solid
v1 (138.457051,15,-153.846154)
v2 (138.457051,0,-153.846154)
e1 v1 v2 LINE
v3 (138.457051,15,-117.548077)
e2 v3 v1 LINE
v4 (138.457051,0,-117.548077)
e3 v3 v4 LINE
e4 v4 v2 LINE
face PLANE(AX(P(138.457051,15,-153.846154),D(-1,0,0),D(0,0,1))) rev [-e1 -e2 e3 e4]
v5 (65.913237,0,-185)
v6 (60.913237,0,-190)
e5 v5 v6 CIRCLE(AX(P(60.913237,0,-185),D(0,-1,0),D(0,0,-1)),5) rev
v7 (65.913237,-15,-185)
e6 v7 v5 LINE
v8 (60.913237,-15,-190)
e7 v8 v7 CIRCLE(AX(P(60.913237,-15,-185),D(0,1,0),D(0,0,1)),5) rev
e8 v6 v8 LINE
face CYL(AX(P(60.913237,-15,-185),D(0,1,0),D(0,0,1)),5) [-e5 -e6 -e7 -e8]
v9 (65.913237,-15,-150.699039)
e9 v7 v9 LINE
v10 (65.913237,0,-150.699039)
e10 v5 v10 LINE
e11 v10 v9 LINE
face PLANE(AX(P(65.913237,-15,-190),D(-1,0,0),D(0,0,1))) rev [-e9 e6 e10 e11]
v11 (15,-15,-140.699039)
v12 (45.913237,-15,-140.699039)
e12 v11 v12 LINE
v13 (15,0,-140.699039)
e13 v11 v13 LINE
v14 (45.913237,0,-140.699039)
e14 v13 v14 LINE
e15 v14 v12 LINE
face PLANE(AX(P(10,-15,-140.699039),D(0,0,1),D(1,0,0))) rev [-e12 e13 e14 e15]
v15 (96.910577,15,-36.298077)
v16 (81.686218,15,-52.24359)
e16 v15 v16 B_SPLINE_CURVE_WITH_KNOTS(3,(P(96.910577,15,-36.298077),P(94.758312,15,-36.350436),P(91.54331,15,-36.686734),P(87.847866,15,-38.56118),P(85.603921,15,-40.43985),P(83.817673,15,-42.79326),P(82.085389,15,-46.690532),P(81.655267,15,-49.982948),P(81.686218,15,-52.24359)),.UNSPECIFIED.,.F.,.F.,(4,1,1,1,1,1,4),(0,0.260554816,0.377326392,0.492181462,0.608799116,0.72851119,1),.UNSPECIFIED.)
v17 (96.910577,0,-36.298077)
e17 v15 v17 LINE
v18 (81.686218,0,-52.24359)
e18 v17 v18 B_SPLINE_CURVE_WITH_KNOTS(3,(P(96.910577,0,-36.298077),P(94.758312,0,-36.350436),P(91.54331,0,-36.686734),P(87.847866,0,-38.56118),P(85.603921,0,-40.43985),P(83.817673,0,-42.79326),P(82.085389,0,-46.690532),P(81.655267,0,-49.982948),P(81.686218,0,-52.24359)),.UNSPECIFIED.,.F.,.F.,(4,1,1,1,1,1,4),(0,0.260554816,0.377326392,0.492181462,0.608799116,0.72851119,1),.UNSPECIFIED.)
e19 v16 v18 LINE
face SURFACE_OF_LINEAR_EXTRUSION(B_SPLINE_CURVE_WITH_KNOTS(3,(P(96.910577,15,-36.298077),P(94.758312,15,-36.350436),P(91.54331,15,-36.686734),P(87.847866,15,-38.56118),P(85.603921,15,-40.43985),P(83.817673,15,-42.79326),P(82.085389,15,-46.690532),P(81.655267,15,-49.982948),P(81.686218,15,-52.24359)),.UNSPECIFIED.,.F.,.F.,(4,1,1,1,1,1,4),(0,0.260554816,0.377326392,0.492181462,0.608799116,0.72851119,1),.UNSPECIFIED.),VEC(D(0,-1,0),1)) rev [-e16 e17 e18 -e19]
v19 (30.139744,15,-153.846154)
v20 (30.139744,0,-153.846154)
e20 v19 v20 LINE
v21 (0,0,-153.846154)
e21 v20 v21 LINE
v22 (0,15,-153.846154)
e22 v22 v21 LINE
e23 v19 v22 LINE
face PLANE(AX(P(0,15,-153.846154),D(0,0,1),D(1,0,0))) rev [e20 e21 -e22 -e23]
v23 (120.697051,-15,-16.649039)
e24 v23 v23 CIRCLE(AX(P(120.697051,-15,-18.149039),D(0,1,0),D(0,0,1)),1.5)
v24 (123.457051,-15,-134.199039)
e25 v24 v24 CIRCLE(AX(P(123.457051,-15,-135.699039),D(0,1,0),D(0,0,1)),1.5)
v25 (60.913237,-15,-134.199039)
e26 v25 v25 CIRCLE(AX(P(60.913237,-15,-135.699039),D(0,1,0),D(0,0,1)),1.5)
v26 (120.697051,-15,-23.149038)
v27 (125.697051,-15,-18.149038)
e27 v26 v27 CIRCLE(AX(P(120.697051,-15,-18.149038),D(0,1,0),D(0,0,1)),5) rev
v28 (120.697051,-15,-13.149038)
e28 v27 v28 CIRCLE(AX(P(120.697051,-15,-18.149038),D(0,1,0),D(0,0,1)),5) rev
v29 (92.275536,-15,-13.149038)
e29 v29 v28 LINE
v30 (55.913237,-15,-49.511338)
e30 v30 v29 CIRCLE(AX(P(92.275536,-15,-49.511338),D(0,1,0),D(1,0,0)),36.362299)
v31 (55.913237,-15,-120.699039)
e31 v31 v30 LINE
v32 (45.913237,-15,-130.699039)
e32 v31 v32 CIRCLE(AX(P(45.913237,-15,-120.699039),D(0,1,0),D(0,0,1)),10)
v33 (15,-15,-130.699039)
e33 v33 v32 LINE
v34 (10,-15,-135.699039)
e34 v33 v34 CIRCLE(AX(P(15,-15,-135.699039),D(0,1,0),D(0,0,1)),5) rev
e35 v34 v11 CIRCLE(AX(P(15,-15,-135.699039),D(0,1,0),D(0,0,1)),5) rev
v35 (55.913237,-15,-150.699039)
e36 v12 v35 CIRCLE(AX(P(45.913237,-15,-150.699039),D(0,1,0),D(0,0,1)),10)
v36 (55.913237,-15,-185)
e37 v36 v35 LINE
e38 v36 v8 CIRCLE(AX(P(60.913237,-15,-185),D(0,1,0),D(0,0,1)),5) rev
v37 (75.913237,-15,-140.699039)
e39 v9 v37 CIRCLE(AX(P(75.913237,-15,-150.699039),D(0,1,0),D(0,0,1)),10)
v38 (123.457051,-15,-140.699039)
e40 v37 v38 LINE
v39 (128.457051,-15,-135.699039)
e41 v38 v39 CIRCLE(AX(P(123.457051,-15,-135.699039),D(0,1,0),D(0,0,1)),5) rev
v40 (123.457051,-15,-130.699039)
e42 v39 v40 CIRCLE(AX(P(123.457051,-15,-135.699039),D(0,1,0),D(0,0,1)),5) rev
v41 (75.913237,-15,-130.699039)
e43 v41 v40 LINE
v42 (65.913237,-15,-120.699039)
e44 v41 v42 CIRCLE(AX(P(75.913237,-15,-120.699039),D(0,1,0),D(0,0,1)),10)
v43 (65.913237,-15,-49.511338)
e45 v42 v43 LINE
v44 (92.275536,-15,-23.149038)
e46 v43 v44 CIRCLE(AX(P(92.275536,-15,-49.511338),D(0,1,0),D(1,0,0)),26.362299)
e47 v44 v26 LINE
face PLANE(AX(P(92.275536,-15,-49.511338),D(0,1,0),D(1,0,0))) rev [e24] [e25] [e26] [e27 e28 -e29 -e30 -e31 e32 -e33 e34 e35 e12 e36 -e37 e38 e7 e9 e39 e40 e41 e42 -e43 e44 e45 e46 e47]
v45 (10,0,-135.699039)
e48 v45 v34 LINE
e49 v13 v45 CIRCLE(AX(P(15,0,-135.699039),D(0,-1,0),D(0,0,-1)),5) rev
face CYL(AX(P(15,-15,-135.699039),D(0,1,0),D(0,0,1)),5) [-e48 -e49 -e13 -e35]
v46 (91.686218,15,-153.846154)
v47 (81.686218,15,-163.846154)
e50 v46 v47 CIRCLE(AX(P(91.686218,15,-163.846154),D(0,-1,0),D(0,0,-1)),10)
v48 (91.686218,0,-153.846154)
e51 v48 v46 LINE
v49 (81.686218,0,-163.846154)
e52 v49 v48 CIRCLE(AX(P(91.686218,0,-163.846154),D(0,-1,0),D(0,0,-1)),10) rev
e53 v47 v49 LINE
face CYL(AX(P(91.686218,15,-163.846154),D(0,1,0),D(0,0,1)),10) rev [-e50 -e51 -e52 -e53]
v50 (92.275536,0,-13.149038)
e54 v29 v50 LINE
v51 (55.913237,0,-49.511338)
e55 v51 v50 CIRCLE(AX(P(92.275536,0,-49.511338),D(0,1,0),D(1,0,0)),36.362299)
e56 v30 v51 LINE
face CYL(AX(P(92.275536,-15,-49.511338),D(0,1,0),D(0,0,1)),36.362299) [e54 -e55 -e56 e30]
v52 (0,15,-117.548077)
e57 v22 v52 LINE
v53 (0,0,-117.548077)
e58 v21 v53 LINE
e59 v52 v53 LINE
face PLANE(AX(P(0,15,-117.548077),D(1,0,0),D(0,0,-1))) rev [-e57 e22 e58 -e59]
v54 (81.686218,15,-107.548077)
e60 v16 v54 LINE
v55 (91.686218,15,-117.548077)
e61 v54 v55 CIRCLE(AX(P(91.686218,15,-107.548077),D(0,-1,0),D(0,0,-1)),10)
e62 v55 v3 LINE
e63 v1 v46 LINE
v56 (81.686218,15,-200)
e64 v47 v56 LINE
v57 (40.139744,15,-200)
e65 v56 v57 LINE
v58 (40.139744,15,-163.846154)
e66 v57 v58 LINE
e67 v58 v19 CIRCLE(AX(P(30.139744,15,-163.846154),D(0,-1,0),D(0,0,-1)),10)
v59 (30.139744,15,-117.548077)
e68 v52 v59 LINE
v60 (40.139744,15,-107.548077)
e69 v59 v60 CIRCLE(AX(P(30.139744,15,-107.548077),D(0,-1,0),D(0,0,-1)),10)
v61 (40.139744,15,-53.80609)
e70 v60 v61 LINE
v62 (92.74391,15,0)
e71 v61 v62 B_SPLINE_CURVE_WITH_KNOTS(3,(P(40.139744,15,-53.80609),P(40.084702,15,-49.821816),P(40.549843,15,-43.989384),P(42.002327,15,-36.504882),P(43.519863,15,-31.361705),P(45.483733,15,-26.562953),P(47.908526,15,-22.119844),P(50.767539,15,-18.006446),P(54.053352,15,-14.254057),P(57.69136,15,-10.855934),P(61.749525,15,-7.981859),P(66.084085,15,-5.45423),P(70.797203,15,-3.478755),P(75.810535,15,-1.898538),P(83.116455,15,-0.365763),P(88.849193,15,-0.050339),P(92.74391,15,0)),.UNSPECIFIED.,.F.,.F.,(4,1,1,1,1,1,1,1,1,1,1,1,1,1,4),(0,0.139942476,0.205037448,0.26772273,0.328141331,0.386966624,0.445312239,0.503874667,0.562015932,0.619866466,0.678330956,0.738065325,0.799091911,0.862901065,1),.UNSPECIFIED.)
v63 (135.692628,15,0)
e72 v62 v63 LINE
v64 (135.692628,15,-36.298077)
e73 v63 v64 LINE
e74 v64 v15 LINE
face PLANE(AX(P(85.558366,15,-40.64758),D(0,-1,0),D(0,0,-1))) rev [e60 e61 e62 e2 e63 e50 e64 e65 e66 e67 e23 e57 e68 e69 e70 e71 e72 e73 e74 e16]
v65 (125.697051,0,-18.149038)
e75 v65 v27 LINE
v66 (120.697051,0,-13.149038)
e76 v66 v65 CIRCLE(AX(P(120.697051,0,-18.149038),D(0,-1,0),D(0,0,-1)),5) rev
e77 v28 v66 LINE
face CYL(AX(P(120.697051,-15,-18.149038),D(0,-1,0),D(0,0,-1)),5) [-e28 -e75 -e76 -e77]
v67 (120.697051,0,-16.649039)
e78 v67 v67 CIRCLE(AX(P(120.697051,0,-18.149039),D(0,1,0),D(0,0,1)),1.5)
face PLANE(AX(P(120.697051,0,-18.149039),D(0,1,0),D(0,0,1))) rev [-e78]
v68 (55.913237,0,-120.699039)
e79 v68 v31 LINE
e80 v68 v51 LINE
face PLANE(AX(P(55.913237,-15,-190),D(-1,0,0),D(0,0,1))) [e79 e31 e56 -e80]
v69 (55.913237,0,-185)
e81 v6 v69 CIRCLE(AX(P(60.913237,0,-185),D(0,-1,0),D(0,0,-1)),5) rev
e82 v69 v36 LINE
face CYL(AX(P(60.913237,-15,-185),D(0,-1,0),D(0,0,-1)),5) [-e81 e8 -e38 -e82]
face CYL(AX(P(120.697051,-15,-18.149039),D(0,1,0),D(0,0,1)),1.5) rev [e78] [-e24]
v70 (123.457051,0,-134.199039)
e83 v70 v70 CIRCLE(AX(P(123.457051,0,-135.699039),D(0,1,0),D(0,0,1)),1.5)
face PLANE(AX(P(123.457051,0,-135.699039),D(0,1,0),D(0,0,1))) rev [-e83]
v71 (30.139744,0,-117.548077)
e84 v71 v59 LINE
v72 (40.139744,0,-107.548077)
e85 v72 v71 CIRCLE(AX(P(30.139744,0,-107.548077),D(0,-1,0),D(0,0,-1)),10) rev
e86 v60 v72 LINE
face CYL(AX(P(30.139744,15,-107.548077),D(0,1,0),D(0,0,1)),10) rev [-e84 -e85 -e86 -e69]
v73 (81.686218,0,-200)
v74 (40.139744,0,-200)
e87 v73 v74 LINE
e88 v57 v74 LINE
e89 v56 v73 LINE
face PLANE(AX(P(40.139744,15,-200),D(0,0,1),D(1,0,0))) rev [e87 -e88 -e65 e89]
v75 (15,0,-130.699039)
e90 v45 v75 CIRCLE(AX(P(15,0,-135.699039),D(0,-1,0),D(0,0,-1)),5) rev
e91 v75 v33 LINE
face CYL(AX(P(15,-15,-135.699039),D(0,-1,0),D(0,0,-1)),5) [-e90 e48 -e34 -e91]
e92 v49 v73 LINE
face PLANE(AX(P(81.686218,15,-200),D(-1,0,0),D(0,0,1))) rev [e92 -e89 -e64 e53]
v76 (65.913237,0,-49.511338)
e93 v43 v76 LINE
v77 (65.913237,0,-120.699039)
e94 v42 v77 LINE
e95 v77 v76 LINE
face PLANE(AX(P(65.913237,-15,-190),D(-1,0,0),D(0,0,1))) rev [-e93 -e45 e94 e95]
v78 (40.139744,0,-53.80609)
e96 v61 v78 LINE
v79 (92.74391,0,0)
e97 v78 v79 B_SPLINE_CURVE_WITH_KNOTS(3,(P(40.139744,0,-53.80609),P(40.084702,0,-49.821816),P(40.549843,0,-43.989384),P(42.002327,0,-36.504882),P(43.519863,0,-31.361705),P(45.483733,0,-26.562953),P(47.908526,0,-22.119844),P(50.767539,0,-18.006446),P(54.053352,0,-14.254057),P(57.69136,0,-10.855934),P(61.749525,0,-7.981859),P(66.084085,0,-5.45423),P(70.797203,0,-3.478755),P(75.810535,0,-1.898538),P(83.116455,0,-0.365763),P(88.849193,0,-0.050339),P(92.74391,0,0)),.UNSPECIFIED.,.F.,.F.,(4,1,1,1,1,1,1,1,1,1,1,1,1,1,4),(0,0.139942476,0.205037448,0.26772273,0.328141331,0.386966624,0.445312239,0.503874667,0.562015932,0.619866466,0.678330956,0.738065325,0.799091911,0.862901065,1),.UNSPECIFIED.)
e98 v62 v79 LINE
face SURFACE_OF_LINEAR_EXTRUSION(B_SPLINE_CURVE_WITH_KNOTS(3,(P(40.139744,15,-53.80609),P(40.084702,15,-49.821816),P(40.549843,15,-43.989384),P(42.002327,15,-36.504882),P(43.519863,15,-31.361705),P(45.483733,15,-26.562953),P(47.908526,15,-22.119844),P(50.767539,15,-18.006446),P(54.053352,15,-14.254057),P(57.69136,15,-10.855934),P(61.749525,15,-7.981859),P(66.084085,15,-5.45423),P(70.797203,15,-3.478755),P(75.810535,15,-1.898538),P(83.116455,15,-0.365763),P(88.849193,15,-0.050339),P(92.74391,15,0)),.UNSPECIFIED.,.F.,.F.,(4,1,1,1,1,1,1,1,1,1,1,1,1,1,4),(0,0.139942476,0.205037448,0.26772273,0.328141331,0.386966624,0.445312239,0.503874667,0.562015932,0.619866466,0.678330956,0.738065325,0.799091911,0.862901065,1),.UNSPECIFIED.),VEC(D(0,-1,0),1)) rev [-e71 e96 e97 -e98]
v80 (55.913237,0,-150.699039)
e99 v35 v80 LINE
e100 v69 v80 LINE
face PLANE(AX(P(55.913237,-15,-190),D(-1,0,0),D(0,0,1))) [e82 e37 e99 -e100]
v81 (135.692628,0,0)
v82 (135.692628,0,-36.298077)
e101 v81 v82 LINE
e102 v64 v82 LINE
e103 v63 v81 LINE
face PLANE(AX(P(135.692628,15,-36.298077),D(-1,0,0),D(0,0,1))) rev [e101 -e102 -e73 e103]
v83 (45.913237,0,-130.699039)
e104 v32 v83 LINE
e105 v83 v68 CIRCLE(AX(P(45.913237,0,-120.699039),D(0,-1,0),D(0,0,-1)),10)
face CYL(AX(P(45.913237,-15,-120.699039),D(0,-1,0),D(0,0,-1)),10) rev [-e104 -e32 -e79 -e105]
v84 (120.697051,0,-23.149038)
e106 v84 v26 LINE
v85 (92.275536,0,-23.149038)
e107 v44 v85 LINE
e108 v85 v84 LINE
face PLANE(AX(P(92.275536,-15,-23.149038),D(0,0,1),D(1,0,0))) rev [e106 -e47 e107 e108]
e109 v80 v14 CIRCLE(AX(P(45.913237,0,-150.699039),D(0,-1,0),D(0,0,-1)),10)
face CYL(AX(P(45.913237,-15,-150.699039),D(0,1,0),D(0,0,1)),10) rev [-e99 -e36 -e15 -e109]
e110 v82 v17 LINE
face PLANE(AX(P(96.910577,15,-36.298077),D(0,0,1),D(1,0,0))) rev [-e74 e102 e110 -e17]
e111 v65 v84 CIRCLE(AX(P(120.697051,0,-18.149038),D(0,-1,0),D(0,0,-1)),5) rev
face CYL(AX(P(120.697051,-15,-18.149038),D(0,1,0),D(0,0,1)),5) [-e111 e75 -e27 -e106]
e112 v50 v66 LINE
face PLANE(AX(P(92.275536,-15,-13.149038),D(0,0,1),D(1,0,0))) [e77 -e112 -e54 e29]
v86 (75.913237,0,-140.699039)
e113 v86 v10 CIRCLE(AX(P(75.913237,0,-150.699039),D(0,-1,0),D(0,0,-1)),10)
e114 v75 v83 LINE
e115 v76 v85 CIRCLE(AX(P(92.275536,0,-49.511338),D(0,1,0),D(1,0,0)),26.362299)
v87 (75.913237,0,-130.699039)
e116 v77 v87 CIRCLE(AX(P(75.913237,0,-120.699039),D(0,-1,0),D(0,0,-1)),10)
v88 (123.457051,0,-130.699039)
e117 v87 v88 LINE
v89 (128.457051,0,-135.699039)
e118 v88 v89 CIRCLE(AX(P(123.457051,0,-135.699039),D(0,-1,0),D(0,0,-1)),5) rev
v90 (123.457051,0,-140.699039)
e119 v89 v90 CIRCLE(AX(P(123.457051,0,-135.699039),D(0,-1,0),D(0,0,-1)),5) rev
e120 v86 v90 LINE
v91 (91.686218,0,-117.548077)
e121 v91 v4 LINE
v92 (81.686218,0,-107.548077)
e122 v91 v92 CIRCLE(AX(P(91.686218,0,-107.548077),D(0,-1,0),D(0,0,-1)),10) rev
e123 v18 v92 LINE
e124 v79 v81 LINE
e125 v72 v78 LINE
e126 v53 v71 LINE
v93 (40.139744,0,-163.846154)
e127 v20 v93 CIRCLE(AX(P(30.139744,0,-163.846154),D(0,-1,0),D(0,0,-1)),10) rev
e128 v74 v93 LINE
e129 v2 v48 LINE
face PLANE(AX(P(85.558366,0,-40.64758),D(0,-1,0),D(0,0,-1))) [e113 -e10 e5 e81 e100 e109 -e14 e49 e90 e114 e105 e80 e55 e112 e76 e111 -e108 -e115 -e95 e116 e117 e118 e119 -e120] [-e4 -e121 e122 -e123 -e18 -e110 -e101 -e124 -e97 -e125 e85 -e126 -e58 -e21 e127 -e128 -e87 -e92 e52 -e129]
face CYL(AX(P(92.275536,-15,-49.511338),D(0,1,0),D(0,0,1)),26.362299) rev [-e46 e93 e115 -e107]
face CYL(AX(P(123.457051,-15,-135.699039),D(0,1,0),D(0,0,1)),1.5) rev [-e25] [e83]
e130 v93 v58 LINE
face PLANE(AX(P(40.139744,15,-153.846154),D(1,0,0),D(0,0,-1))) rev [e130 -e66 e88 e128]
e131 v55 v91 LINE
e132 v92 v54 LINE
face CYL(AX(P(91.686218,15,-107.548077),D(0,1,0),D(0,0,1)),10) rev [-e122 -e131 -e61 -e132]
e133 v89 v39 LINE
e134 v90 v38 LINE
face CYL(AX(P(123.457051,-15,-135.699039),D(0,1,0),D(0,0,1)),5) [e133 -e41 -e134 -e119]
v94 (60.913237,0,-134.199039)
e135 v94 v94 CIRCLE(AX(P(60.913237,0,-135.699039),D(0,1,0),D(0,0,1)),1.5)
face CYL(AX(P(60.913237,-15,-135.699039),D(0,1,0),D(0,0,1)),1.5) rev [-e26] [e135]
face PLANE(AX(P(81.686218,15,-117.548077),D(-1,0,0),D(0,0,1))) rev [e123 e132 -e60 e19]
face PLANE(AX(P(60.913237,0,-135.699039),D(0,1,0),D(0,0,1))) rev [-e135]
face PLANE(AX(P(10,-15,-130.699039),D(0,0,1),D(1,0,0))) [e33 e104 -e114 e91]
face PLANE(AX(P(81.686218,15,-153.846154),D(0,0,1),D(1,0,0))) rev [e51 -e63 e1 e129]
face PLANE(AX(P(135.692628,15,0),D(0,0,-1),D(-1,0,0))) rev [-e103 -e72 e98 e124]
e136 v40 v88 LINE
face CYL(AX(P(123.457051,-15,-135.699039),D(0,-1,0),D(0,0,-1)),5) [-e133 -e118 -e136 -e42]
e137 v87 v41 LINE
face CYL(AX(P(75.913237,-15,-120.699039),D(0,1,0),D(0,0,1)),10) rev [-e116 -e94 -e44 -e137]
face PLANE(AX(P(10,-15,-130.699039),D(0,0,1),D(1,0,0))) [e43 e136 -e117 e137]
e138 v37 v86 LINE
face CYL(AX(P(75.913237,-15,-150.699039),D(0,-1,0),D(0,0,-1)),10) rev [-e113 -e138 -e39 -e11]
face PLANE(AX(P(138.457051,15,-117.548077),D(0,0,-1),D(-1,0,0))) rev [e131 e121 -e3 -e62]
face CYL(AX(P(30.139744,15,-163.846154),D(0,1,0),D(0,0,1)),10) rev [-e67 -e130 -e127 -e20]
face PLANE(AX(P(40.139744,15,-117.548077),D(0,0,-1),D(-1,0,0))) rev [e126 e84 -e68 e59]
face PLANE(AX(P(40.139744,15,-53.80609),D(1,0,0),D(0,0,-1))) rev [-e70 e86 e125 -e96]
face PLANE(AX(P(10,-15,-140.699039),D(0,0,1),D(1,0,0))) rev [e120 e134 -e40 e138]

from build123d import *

# Parameters (mm, degrees)
EXTRUDE_T_DEPTH        = 15
SKETCH_937_W           = 118.457051
SKETCH_937_H           = 10
EXTRUDE_1_DEPTH        = 15
FILLET_1172_R          = 5
FILLET_1670_R          = 10
FILLET_1882_R          = 10
SKETCH_2094_R          = 1.5
CUT_EXTRUDE_2102_DEPTH = 244.711622867


with BuildPart() as part:
    # Эскиз t → t (new body)
    with BuildSketch(Plane(origin=(0, 0, 0), x_dir=(1, 0, 0), z_dir=(0, 1, 0))):
        with BuildLine():
            Line((0, 153.846153846), (40.13974359, 153.846153846))
            Line((40.13974359, 153.846153846), (40.13974359, 200))
            Line((40.13974359, 200), (81.686217949, 200))
            Line((81.686217949, 200), (81.686217949, 153.846153846))
            Line((81.686217949, 153.846153846), (138.457051282, 153.846153846))
            Line((138.457051282, 153.846153846), (138.457051282, 117.548076923))
            Line((138.457051282, 117.548076923), (81.686217949, 117.548076923))
            Line((81.686217949, 117.548076923), (81.686217949, 52.243589744))
            add(Edge.make_bspline(
                [(81.686217949, 52.243589744), (81.655267201, 49.982948441), (82.085389497, 46.690532241), (83.817672815, 42.793259528), (85.603921155, 40.439849904), (87.847865612, 38.561179508), (91.543310131, 36.686733749), (94.758311571, 36.350436228), (96.910576923, 36.298076923)],
                knots=[0, 0, 0, 0, 0.27148881, 0.391200884, 0.507818538, 0.622673608, 0.739445184, 1, 1, 1, 1], degree=3))
            Line((96.910576923, 36.298076923), (135.692628205, 36.298076923))
            Line((135.692628205, 36.298076923), (135.692628205, 0))
            Line((135.692628205, 0), (92.743910256, 0))
            add(Edge.make_bspline(
                [(92.743910256, 0), (88.849192705, 0.050339472), (83.116455127, 0.365762726), (75.810535171, 1.898538288), (70.797203285, 3.478754574), (66.08408468, 5.454229708), (61.749524849, 7.981859361), (57.691359691, 10.855934374), (54.053352032, 14.254057303), (50.767538722, 18.006446438), (47.908525609, 22.119844392), (45.483732962, 26.56295255), (43.519863299, 31.361705258), (42.002327108, 36.504881897), (40.54984301, 43.989384334), (40.084701759, 49.821816441), (40.13974359, 53.806089744)],
                knots=[0, 0, 0, 0, 0.137098935, 0.200908089, 0.261934675, 0.321669044, 0.380133534, 0.437984068, 0.496125333, 0.554687761, 0.613033376, 0.671858669, 0.73227727, 0.794962552, 0.860057524, 1, 1, 1, 1], degree=3))
            Line((40.13974359, 53.806089744), (40.13974359, 117.548076923))
            Line((40.13974359, 117.548076923), (0, 117.548076923))
            Line((0, 117.548076923), (0, 153.846153846))
        make_face()
    extrude(amount=EXTRUDE_T_DEPTH)

    # Sketch 937 → Вытянуть-Тонкостенный1 (add)
    with BuildSketch(Plane(origin=(0, 0, 0), x_dir=(1, 0, 0), z_dir=(0, 1, 0))):
        with BuildLine():
            Line((55.913237, 190), (55.913237, 49.511337503))
            ThreePointArc((55.913237, 49.511337503), (66.563507798, 23.799309298), (92.275536003, 13.1490385))
            Line((92.275536003, 13.1490385), (125.697051, 13.1490385))
            Line((125.697051, 13.1490385), (125.697051, 23.1490385))
            Line((125.697051, 23.1490385), (92.275536003, 23.1490385))
            ThreePointArc((92.275536003, 23.1490385), (73.63457561, 30.87037711), (65.913237, 49.511337503))
            Line((65.913237, 49.511337503), (65.913237, 190))
            Line((65.913237, 190), (55.913237, 190))
        make_face()
        with Locations((69.2285255, 135.6990385)):
            Rectangle(SKETCH_937_W, SKETCH_937_H)
    extrude(amount=-EXTRUDE_1_DEPTH)

    # Fillet 1172
    fillet_1172_edges = [part.edges().sort_by_distance(p)[0] for p in [
        (128.457051, -7.5, -140.6990385),
        (128.457051, -7.5, -130.6990385),
        (125.697051, -7.5, -23.1490385),
        (125.697051, -7.5, -13.1490385),
        (10, -7.5, -130.6990385),
        (10, -7.5, -140.6990385),
        (55.913237, -7.5, -190),
        (65.913237, -7.5, -190),
    ]]
    fillet(fillet_1172_edges, radius=FILLET_1172_R - 0.0001)  # a hair under: the kernel refuses the full size

    # Fillet 1670
    fillet_1670_edges = [part.edges().sort_by_distance(p)[0] for p in [
        (55.913237, -7.5, -140.6990385),
        (65.913237, -7.5, -130.6990385),
        (65.913237, -7.5, -140.6990385),
        (55.913237, -7.5, -130.6990385),
    ]]
    fillet(fillet_1670_edges, radius=FILLET_1670_R)

    # Fillet 1882
    fillet_1882_edges = [part.edges().sort_by_distance(p)[0] for p in [
        (40.13974359, 7.5, -153.846153846),
        (81.686217949, 7.5, -153.846153846),
        (81.686217949, 7.5, -117.548076923),
        (40.13974359, 7.5, -117.548076923),
    ]]
    fillet(fillet_1882_edges, radius=FILLET_1882_R)

    # Sketch 2094 → Cut-Extrude 2102 (cut, through all)
    with BuildSketch(Plane(origin=(0, 0, 0), x_dir=(1, 0, 0), z_dir=(0, 1, 0))):
        with Locations(Location((60.913237, 135.699039, 0), (0, 0, 270))):
            Circle(SKETCH_2094_R)
        with Locations(Location((120.697051, 18.149039, 0), (0, 0, 270))):
            Circle(SKETCH_2094_R)
        with Locations(Location((123.457051, 135.699039, 0), (0, 0, 270))):
            Circle(SKETCH_2094_R)
    extrude(amount=-CUT_EXTRUDE_2102_DEPTH, mode=Mode.SUBTRACT)


solid = part.part
